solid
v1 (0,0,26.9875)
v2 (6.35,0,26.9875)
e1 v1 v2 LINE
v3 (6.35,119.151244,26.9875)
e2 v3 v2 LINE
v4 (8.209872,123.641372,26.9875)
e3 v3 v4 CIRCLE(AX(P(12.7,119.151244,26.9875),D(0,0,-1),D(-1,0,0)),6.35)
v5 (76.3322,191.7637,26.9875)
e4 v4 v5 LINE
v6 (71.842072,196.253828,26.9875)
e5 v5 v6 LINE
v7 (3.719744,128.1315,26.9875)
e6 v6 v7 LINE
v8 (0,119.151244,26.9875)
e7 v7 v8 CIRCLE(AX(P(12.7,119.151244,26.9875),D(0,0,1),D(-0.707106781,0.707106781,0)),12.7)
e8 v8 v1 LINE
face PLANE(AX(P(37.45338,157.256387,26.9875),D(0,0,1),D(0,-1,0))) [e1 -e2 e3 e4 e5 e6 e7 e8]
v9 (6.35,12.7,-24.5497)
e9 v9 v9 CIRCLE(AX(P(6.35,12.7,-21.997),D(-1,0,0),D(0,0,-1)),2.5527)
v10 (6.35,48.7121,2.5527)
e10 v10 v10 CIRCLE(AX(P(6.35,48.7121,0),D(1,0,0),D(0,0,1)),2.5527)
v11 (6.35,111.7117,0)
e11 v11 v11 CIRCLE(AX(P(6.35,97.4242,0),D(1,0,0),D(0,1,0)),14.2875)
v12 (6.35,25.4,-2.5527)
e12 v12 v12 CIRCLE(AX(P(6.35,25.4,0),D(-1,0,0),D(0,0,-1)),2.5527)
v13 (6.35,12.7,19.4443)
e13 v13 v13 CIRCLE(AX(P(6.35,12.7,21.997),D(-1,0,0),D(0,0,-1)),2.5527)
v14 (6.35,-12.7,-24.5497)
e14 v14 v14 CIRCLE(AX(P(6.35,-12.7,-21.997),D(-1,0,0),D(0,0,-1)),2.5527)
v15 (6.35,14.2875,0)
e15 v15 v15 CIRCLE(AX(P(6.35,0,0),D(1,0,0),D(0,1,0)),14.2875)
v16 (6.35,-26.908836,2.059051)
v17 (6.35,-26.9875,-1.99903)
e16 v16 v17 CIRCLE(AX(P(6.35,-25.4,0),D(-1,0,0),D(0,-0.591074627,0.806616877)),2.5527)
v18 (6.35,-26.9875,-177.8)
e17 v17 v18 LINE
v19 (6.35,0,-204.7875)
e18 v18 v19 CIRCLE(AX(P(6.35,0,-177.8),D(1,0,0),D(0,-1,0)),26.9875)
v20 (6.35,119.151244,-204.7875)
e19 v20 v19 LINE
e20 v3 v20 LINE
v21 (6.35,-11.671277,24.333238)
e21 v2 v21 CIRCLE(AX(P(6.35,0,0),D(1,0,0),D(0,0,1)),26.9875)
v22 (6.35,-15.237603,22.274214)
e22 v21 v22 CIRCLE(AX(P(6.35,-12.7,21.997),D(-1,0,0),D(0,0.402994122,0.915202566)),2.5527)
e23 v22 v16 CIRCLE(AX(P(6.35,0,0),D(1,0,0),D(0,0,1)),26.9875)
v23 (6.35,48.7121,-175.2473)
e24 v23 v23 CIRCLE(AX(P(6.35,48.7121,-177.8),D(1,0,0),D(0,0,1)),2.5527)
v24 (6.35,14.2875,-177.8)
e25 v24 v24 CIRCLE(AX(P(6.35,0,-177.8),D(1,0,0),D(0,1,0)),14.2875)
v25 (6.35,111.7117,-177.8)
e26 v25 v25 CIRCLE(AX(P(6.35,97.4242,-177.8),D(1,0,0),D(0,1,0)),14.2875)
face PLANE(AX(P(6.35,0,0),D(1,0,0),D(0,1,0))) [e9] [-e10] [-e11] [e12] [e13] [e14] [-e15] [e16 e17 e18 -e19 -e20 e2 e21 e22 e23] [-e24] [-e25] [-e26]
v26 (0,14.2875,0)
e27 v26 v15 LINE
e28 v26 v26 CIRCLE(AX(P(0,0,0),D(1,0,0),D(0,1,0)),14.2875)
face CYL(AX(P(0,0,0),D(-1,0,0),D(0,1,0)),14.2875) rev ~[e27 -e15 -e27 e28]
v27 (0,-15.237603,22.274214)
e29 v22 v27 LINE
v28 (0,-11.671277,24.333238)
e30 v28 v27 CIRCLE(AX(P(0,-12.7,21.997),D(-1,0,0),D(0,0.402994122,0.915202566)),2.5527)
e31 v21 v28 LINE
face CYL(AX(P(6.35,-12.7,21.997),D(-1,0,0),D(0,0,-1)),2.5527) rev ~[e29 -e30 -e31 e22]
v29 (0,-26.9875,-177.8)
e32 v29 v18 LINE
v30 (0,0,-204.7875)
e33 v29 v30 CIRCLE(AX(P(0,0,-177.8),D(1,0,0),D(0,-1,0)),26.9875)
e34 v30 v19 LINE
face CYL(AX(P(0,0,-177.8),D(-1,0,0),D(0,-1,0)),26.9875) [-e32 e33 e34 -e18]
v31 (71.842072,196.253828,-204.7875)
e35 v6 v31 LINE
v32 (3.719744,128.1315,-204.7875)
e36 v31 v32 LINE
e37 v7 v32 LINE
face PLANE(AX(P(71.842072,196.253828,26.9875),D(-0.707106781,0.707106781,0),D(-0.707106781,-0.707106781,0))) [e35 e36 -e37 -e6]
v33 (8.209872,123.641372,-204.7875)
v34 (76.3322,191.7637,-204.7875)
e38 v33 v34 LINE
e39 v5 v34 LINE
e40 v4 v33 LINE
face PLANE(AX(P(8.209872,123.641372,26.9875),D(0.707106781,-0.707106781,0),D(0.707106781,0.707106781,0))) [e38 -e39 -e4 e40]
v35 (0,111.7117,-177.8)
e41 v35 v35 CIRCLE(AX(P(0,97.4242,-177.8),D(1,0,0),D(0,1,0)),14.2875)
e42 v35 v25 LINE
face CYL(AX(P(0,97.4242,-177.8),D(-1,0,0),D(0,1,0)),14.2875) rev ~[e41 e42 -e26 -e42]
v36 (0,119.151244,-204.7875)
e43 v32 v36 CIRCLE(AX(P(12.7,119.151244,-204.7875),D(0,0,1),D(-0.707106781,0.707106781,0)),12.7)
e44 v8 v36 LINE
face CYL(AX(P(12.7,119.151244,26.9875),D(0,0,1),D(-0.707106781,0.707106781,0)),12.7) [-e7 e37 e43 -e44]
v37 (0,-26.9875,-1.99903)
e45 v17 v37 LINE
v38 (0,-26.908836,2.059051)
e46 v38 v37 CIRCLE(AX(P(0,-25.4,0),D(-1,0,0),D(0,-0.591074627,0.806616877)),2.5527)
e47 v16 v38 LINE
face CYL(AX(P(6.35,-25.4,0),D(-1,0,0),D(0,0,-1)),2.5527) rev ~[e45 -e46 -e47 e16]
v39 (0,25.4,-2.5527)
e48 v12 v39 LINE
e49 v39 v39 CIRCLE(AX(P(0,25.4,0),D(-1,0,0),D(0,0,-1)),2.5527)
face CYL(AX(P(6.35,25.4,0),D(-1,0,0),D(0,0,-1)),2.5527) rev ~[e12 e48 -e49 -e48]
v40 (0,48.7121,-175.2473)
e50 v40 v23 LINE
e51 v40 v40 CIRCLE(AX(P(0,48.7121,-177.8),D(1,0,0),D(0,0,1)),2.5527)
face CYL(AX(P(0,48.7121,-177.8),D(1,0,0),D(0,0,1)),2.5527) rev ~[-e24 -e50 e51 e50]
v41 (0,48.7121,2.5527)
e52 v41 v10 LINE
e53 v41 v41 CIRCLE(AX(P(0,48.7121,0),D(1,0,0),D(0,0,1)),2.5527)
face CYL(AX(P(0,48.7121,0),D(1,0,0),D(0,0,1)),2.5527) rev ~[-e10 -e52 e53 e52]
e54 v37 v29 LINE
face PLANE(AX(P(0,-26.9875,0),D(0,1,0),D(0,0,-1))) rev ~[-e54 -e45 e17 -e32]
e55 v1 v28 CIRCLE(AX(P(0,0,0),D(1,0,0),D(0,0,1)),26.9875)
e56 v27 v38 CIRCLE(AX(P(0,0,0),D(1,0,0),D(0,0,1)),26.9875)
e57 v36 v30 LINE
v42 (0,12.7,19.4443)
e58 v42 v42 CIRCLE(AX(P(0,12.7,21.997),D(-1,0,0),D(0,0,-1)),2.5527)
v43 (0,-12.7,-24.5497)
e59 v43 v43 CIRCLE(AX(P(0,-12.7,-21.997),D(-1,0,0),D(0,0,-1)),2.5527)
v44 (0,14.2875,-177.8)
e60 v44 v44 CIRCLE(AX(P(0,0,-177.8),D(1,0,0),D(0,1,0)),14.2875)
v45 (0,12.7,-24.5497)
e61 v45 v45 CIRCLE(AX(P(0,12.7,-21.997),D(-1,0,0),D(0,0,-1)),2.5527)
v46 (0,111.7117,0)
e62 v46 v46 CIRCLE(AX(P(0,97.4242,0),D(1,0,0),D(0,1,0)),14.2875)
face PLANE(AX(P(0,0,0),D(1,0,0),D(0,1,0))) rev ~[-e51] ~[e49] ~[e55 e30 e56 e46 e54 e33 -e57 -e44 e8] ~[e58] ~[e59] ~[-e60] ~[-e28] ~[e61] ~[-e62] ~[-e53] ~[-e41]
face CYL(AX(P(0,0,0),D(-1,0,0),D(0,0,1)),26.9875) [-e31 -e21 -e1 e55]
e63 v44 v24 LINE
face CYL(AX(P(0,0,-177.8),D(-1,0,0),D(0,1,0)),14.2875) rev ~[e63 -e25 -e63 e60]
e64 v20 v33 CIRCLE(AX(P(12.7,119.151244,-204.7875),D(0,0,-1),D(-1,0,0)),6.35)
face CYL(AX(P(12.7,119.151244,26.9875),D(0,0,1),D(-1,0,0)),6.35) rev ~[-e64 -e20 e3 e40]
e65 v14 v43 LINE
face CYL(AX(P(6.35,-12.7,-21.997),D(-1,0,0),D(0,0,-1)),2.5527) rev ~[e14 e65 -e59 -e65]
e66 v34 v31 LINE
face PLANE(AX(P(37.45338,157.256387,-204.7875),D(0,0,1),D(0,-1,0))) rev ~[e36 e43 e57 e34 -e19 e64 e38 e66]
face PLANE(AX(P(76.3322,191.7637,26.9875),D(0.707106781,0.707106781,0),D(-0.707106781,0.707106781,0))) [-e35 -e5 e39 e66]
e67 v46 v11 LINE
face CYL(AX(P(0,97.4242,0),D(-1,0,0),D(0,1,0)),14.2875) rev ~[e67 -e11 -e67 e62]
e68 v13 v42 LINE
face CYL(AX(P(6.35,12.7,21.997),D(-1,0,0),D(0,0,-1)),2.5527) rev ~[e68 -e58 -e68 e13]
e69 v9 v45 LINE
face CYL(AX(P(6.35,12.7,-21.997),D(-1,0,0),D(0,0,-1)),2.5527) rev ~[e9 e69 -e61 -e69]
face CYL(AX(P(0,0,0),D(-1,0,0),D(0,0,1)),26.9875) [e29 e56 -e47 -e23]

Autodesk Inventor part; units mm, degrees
ref_plane "YZ Plane" through (0, 0, 0) normal (1, 0, 0) x (0, 1, 0)
ref_plane "XZ Plane" through (0, 0, 0) normal (0, 1, 0) x (-1, 0, 0)
ref_plane "XY Plane" through (0, 0, 0) normal (0, 0, 1) x (1, 0, 0)
sketch "Sketch1" plane through (0, 0, 0) normal (1, 0, 0) x (0, 1, 0)
  circle A0 centre (0, 0) radius 14.2875
  circle A1 centre (0, -177.8) radius 14.2875
  line L0 (152.4, -31.75) -> (-152.4, -31.75) construction
  line L1 (-152.4, -31.75) -> (-152.4, -146.05) construction
  line L2 (-152.4, -146.05) -> (152.4, -146.05) construction
  line L3 (152.4, -146.05) -> (152.4, -31.75) construction
  line L4 (152.4, -31.75) -> (-152.4, -146.05) construction
  line L5 (-152.4, -31.75) -> (152.4, -146.05) construction
  circle A2 centre (0, 0) radius 38.1 construction
  circle A3 centre (0, -177.8) radius 38.1 construction
  circle A4 centre (0, 0) radius 31.75 construction
  circle A5 centre (0, -177.8) radius 31.75 construction
  circle A6 centre (0, 0) radius 26.9875 construction
  circle A7 centre (0, -177.8) radius 26.9875 construction
  circle A8 centre (97.4242, -177.8) radius 14.2875
  circle A9 centre (97.4242, -177.8) radius 38.1 construction
  circle A10 centre (97.4242, -177.8) radius 31.75 construction
  circle A11 centre (97.4242, -177.8) radius 26.9875 construction
  circle A12 centre (97.4242, 0) radius 14.2875
  circle A13 centre (97.4242, 0) radius 38.1 construction
  circle A14 centre (97.4242, 0) radius 31.75 construction
  circle A15 centre (97.4242, 0) radius 26.9875 construction
  line L6 (124.4117, -204.7875) -> (0, -204.7875)
  line L7 (124.4117, 26.9875) -> (0, 26.9875)
  line L8 (124.4117, 26.9875) -> (124.4117, -204.7875)
  line L9 (-26.9875, 0) -> (-26.9875, -177.8)
  arc A16 (0, 26.9875) -> (-26.9875, 0) centre (0, 0) ccw
  arc A17 (-26.9875, -177.8) -> (0, -204.7875) centre (0, -177.8) ccw
  line L10 (97.4242, -177.8) -> (0, -177.8) construction
  point P0 (0, -88.9)
  point P1 (97.4242, -204.7875)
  point P2 (124.4117, 0)
  point P3 (48.7121, 0)
  point P4 (48.7121, -177.8)
  point P5 (48.7121, -177.8)
  dimension "d0" = 28.575
  dimension "d2" = 304.8
  dimension "d3" = 114.3
  dimension "d4" = 76.2
  dimension "d6" = 6.35
  dimension "d7" = 12.7
  dimension "d8" = 97.4242
extrude "Extrusion1" add sketch "Sketch1" along normal blind 6.35
hole "Hole1" at (0, 48.7121, 0) at (0, 48.7121, -177.8) direction (1, 0, 0) diameter 5.1054 end through all clearance for "Flat Head Machine Screw (82)" size "#10" standard "Ansi Unified Screw Threads"
sketch "Sketch2" plane through (4.4901, 119.9216, 26.9875) normal (-0.7071068, 0.7071068, 0) x (-0.7071068, -0.7071068, 0)
  line L0 (0, -231.775) -> (0, 0)
  line L1 (0, 0) -> (-101.6, 0)
  line L2 (-101.6, 0) -> (-101.6, -231.775)
  line L3 (-101.6, -231.775) -> (0, -231.775)
edge flange "Flange1" height 101.6 angle 45 thickness 6.35 bend radius 6.35 thickness toward (-0.7071068, 0.7071068, 0) relief tear relief width 6.35 relief depth 3.175 edges at (6.35, 124.4117, -88.9) wall of the first edge with corners at (4.4901, 119.9216, -204.7875) (4.4901, 119.9216, 26.9875) (76.3322, 191.7637, 26.9875) (76.3322, 191.7637, -204.7875)
bend "Bend1"
corner "Corner1"
sketch "Sketch4" plane through (6.35, 0, 0) normal (1, 0, 0) x (0, 0, -1)
  circle A0 centre (0, 0) radius 14.2875 construction
  circle A1 centre (0, 0) radius 25.4 construction
  point P0 (0, 25.4)
  point P1 (-21.997, 12.7)
  point P2 (-21.997, -12.7)
  point P3 (0, -25.4)
  point P4 (21.997, -12.7)
  point P5 (21.997, 12.7)
  dimension "d38" = 50.8
  dimension "d41" = 360
hole "Hole3" at (6.35, 25.4, 0) at (6.35, 12.7, 21.997) at (6.35, -12.7, 21.997) at (6.35, -25.4, 0) at (6.35, -12.7, -21.997) at (6.35, 12.7, -21.997) direction (-1, 0, 0) diameter 5.1054 end through all clearance for "Flat Head Machine Screw (82)" size "#10" standard "Ansi Unified Screw Threads"
equation "\"d48\" = Thickness"
equation "\"d18\" = Thickness"
equation "\"d19\" = BendReliefWidth"
equation "\"d20\" = BendReliefDepth"
equation "\"d21\" = MinimumRemnant"
equation "\"d22\" = TransitionRadius"
equation "\"d25\" = BendRadius"
equation "\"d26\" = CornerReliefSize"
equation "\"d27\" = GapSize"
equation "\"d28\" = JacobiRadiusSize"
equation "\"BendRadius\" = Thickness"
equation "\"BendReliefWidth\" = Thickness"
equation "\"BendReliefDepth\" = 0.5 * Thickness"
equation "\"CornerReliefSize\" = 4 * Thickness"
equation "\"MinimumRemnant\" = 2 * Thickness"
equation "\"TransitionRadius\" = BendRadius"
equation "\"JacobiRadiusSize\" = BendRadius"
equation "\"GapSize\" = Thickness"
equation "\"Thickness\" = 6.35"
properties part number "GP4-005" material "Polycarbonate, Smoke"
